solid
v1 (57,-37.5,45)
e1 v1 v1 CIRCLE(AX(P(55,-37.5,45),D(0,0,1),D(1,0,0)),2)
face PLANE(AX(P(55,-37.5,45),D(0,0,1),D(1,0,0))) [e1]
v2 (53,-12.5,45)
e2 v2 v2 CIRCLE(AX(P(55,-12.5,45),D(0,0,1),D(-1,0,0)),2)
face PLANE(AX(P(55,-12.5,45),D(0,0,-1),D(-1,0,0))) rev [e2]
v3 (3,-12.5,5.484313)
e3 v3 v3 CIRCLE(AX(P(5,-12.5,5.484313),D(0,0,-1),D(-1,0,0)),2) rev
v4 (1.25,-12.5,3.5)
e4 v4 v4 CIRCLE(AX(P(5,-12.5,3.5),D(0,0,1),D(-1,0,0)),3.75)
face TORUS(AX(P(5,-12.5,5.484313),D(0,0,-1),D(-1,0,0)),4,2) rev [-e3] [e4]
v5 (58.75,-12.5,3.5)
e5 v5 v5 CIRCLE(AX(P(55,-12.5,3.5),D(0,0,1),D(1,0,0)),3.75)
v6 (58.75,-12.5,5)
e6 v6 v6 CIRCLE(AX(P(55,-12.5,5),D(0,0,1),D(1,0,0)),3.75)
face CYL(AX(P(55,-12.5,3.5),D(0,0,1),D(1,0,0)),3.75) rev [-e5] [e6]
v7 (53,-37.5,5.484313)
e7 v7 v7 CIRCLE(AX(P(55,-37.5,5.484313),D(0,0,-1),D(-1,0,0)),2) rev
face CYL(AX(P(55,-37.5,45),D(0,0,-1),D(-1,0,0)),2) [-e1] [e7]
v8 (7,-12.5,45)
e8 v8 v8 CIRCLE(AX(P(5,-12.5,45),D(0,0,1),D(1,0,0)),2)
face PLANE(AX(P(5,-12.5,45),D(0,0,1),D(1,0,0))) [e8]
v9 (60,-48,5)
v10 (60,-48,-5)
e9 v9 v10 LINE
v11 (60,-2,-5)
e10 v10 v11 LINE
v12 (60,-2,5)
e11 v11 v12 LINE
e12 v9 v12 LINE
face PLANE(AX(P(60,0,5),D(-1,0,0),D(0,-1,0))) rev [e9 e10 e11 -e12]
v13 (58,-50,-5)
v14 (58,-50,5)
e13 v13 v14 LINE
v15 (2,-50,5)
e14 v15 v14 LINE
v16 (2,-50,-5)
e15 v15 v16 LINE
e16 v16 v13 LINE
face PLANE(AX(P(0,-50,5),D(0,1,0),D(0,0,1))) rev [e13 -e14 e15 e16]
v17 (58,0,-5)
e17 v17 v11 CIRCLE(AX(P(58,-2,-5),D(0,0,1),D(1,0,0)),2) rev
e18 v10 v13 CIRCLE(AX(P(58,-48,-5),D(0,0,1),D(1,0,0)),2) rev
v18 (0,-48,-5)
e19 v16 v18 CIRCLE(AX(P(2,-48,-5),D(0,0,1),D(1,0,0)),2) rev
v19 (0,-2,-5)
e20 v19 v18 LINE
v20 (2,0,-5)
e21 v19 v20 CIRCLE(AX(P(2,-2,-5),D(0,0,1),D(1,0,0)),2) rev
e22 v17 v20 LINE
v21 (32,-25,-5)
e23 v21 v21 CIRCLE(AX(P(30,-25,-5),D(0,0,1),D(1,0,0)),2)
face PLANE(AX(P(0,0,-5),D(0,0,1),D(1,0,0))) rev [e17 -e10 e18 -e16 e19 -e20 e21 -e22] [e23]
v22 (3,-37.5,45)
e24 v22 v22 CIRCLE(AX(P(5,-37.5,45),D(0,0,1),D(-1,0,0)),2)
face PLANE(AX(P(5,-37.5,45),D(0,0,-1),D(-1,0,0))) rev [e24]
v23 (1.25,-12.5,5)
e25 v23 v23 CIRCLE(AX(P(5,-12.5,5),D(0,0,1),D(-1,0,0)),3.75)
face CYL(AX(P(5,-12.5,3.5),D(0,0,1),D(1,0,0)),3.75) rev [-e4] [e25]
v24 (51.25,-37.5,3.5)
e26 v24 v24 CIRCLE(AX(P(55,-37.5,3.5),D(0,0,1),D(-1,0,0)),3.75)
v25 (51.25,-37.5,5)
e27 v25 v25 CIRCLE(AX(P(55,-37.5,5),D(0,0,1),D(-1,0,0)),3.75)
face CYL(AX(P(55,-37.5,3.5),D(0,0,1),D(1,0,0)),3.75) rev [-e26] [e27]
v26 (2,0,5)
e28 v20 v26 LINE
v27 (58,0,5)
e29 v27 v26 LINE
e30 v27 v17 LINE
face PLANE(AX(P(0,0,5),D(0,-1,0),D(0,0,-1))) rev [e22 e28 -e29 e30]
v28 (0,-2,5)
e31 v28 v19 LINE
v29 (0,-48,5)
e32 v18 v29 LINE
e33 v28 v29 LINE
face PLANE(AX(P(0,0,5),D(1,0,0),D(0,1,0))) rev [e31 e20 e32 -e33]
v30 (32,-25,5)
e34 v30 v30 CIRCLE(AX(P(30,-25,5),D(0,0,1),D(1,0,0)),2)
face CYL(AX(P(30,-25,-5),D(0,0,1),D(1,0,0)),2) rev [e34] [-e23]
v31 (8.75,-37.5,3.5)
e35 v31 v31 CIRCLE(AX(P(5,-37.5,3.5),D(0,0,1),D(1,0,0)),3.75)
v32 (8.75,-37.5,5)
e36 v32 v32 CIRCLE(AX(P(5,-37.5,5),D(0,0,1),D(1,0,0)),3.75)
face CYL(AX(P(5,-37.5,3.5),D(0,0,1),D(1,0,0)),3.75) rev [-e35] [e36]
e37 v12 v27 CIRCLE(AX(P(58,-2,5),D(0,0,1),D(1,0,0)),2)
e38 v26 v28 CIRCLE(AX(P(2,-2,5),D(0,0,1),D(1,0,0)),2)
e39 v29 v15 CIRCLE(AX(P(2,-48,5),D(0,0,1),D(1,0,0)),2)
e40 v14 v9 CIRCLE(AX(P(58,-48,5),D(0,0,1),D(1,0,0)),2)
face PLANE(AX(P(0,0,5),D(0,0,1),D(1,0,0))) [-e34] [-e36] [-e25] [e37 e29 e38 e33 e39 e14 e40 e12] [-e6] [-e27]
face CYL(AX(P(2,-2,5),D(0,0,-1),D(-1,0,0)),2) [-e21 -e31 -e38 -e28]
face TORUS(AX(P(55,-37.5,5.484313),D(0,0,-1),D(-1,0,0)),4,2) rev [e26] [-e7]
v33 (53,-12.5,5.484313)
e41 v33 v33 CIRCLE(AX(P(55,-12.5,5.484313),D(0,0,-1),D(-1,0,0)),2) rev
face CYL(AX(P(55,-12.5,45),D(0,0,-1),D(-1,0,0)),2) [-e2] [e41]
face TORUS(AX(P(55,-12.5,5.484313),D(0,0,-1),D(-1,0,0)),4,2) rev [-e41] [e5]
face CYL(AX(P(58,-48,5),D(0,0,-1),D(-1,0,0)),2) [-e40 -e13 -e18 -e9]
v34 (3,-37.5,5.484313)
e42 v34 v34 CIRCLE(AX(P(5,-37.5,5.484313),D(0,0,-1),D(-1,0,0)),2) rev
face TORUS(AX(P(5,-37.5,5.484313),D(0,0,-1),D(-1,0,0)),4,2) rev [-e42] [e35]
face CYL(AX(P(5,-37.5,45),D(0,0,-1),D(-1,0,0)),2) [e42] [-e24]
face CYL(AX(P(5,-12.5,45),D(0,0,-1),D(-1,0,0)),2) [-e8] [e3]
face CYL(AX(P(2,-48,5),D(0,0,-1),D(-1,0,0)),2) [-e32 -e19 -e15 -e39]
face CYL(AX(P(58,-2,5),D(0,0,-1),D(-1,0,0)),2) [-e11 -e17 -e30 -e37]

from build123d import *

# Parameters (mm, degrees)
ESQUISSE1_W             = 60
ESQUISSE1_H             = 50
BOSS_EXTRU_1_DEPTH      = 5
ESQUISSE2_R             = 2
BOSS_EXTRU_2_DEPTH      = 40
ESQUISSE3_R             = 2
ENL_V_MAT_EXTRU_1_DEPTH = 88.749643874
CONG_1_R                = 2
CONG_2_R                = 2
ENL_V_START             = -1.5
ESQUISSE4_R             = 3.75
ESQUISSE4_R_2           = 2
ENL_V_MAT_EXTRU_5_DEPTH = 1.5
CONG_5_R                = 2
CONG_6_R                = 2
CONG_7_R                = 2
CONG_8_R                = 2


with BuildPart() as part:
    # Esquisse1 → Boss.-Extru.1 (new, symmetric)
    with BuildSketch(Plane.XY):
        with Locations((30, -25)):
            Rectangle(ESQUISSE1_W, ESQUISSE1_H)
    extrude(amount=BOSS_EXTRU_1_DEPTH, both=True)

    # Esquisse2 → Boss.-Extru.2 (add)
    with BuildSketch(Plane.XY.offset(5)):
        with Locations((5, -12.5)):
            Circle(ESQUISSE2_R)
        with Locations(Location((5, -37.5, 0), (0, 0, 180))):
            Circle(ESQUISSE2_R)
        with Locations((55, -37.5)):
            Circle(ESQUISSE2_R)
        with Locations(Location((55, -12.5, 0), (0, 0, 180))):
            Circle(ESQUISSE2_R)
    extrude(amount=BOSS_EXTRU_2_DEPTH)

    # Esquisse3 → Enlèv. mat.-Extru.1 (cut, through all)
    with BuildSketch(Plane.XY.offset(5)):
        with Locations((30, -25)):
            Circle(ESQUISSE3_R)
    extrude(amount=-ENL_V_MAT_EXTRU_1_DEPTH, mode=Mode.SUBTRACT)

    # Congé1
    cong_1_edges = [part.edges().sort_by_distance(p)[0] for p in [
        (0, 0, 0),
    ]]
    fillet(cong_1_edges, radius=CONG_1_R)

    # Congé2
    cong_2_edges = [part.edges().sort_by_distance(p)[0] for p in [
        (60, 0, 0),
        (60, -50, 0),
        (0, -50, 0),
    ]]
    fillet(cong_2_edges, radius=CONG_2_R)

    # Esquisse4 → Enlèv. mat.-Extru.5 (cut)
    # profile 1 of 4: a face of its own
    with BuildSketch(Plane.XY.offset(5).offset(ENL_V_START)):
        with Locations((5, -37.5)):
            Circle(ESQUISSE4_R)
        with Locations(Location((5, -37.5, 0), (0, 0, 180))):
            Circle(ESQUISSE4_R_2, mode=Mode.SUBTRACT)
    # profile 2 of 4: a face of its own
    with BuildSketch(Plane.XY.offset(5).offset(ENL_V_START)):
        with Locations(Location((5, -12.5, 0), (0, 0, 180))):
            Circle(ESQUISSE4_R)
        with Locations((5, -12.5)):
            Circle(ESQUISSE4_R_2, mode=Mode.SUBTRACT)
    # profile 3 of 4: a face of its own
    with BuildSketch(Plane.XY.offset(5).offset(ENL_V_START)):
        with Locations((55, -12.5)):
            Circle(ESQUISSE4_R)
        with Locations(Location((55, -12.5, 0), (0, 0, 180))):
            Circle(ESQUISSE4_R_2, mode=Mode.SUBTRACT)
    # profile 4 of 4: a face of its own
    with BuildSketch(Plane.XY.offset(5).offset(ENL_V_START)):
        with Locations(Location((55, -37.5, 0), (0, 0, 180))):
            Circle(ESQUISSE4_R)
        with Locations((55, -37.5)):
            Circle(ESQUISSE4_R_2, mode=Mode.SUBTRACT)
    extrude(amount=ENL_V_MAT_EXTRU_5_DEPTH, mode=Mode.SUBTRACT)

    # Congé5
    # the kernel refuses this fillet: 2 mm, written as the material it adds along each edge
    with BuildSketch(Plane(origin=(55, -37.5, 3.5), x_dir=(1, 0, 0), z_dir=(0, -1, 0))) as cong_5_piece_1:
        with BuildLine():
            CenterArc((4, 1.984313483), CONG_5_R, 180, 82.819244219)
            Line((2, 1.984313483), (1.96, 1.984313483))
            Line((1.96, 1.984313483), (1.96, 0))
            Line((1.96, 0), (2, -0.04))
            ThreePointArc((2, -0.04), (2.875, -0.04), (3.745, -0.03968627))
            Line((3.745, -0.03968627), (3.75, 0))
        make_face()
    revolve(axis=Axis((55, -37.5, 3.5), (0, 0, 1)))

    # Congé6
    # the kernel refuses this fillet: 2 mm, written as the material it adds along each edge
    with BuildSketch(Plane(origin=(55, -12.5, 3.5), x_dir=(-1, 0, 0), z_dir=(0, 1, 0))) as cong_6_piece_1:
        with BuildLine():
            CenterArc((4, 1.984313483), CONG_6_R, 180, 82.819244219)
            Line((2, 1.984313483), (1.96, 1.984313483))
            Line((1.96, 1.984313483), (1.96, 0))
            Line((1.96, 0), (2, -0.04))
            ThreePointArc((2, -0.04), (2.875, -0.04), (3.745, -0.03968627))
            Line((3.745, -0.03968627), (3.75, 0))
        make_face()
    revolve(axis=Axis((55, -12.5, 3.5), (0, 0, 1)))

    # Congé7
    # the kernel refuses this fillet: 2 mm, written as the material it adds along each edge
    with BuildSketch(Plane(origin=(5, -12.5, 3.5), x_dir=(1, 0, 0), z_dir=(0, -1, 0))) as cong_7_piece_1:
        with BuildLine():
            CenterArc((4, 1.984313483), CONG_7_R, 180, 82.819244219)
            Line((2, 1.984313483), (1.96, 1.984313483))
            Line((1.96, 1.984313483), (1.96, 0))
            Line((1.96, 0), (2, -0.04))
            ThreePointArc((2, -0.04), (2.875, -0.04), (3.745, -0.03968627))
            Line((3.745, -0.03968627), (3.75, 0))
        make_face()
    revolve(axis=Axis((5, -12.5, 3.5), (0, 0, 1)))

    # Congé8
    # the kernel refuses this fillet: 2 mm, written as the material it adds along each edge
    with BuildSketch(Plane(origin=(5, -37.5, 3.5), x_dir=(-1, 0, 0), z_dir=(0, 1, 0))) as cong_8_piece_1:
        with BuildLine():
            CenterArc((4, 1.984313483), CONG_8_R, 180, 82.819244219)
            Line((2, 1.984313483), (1.96, 1.984313483))
            Line((1.96, 1.984313483), (1.96, 0))
            Line((1.96, 0), (2, -0.04))
            ThreePointArc((2, -0.04), (2.875, -0.04), (3.745, -0.03968627))
            Line((3.745, -0.03968627), (3.75, 0))
        make_face()
    revolve(axis=Axis((5, -37.5, 3.5), (0, 0, 1)))


solid = part.part
